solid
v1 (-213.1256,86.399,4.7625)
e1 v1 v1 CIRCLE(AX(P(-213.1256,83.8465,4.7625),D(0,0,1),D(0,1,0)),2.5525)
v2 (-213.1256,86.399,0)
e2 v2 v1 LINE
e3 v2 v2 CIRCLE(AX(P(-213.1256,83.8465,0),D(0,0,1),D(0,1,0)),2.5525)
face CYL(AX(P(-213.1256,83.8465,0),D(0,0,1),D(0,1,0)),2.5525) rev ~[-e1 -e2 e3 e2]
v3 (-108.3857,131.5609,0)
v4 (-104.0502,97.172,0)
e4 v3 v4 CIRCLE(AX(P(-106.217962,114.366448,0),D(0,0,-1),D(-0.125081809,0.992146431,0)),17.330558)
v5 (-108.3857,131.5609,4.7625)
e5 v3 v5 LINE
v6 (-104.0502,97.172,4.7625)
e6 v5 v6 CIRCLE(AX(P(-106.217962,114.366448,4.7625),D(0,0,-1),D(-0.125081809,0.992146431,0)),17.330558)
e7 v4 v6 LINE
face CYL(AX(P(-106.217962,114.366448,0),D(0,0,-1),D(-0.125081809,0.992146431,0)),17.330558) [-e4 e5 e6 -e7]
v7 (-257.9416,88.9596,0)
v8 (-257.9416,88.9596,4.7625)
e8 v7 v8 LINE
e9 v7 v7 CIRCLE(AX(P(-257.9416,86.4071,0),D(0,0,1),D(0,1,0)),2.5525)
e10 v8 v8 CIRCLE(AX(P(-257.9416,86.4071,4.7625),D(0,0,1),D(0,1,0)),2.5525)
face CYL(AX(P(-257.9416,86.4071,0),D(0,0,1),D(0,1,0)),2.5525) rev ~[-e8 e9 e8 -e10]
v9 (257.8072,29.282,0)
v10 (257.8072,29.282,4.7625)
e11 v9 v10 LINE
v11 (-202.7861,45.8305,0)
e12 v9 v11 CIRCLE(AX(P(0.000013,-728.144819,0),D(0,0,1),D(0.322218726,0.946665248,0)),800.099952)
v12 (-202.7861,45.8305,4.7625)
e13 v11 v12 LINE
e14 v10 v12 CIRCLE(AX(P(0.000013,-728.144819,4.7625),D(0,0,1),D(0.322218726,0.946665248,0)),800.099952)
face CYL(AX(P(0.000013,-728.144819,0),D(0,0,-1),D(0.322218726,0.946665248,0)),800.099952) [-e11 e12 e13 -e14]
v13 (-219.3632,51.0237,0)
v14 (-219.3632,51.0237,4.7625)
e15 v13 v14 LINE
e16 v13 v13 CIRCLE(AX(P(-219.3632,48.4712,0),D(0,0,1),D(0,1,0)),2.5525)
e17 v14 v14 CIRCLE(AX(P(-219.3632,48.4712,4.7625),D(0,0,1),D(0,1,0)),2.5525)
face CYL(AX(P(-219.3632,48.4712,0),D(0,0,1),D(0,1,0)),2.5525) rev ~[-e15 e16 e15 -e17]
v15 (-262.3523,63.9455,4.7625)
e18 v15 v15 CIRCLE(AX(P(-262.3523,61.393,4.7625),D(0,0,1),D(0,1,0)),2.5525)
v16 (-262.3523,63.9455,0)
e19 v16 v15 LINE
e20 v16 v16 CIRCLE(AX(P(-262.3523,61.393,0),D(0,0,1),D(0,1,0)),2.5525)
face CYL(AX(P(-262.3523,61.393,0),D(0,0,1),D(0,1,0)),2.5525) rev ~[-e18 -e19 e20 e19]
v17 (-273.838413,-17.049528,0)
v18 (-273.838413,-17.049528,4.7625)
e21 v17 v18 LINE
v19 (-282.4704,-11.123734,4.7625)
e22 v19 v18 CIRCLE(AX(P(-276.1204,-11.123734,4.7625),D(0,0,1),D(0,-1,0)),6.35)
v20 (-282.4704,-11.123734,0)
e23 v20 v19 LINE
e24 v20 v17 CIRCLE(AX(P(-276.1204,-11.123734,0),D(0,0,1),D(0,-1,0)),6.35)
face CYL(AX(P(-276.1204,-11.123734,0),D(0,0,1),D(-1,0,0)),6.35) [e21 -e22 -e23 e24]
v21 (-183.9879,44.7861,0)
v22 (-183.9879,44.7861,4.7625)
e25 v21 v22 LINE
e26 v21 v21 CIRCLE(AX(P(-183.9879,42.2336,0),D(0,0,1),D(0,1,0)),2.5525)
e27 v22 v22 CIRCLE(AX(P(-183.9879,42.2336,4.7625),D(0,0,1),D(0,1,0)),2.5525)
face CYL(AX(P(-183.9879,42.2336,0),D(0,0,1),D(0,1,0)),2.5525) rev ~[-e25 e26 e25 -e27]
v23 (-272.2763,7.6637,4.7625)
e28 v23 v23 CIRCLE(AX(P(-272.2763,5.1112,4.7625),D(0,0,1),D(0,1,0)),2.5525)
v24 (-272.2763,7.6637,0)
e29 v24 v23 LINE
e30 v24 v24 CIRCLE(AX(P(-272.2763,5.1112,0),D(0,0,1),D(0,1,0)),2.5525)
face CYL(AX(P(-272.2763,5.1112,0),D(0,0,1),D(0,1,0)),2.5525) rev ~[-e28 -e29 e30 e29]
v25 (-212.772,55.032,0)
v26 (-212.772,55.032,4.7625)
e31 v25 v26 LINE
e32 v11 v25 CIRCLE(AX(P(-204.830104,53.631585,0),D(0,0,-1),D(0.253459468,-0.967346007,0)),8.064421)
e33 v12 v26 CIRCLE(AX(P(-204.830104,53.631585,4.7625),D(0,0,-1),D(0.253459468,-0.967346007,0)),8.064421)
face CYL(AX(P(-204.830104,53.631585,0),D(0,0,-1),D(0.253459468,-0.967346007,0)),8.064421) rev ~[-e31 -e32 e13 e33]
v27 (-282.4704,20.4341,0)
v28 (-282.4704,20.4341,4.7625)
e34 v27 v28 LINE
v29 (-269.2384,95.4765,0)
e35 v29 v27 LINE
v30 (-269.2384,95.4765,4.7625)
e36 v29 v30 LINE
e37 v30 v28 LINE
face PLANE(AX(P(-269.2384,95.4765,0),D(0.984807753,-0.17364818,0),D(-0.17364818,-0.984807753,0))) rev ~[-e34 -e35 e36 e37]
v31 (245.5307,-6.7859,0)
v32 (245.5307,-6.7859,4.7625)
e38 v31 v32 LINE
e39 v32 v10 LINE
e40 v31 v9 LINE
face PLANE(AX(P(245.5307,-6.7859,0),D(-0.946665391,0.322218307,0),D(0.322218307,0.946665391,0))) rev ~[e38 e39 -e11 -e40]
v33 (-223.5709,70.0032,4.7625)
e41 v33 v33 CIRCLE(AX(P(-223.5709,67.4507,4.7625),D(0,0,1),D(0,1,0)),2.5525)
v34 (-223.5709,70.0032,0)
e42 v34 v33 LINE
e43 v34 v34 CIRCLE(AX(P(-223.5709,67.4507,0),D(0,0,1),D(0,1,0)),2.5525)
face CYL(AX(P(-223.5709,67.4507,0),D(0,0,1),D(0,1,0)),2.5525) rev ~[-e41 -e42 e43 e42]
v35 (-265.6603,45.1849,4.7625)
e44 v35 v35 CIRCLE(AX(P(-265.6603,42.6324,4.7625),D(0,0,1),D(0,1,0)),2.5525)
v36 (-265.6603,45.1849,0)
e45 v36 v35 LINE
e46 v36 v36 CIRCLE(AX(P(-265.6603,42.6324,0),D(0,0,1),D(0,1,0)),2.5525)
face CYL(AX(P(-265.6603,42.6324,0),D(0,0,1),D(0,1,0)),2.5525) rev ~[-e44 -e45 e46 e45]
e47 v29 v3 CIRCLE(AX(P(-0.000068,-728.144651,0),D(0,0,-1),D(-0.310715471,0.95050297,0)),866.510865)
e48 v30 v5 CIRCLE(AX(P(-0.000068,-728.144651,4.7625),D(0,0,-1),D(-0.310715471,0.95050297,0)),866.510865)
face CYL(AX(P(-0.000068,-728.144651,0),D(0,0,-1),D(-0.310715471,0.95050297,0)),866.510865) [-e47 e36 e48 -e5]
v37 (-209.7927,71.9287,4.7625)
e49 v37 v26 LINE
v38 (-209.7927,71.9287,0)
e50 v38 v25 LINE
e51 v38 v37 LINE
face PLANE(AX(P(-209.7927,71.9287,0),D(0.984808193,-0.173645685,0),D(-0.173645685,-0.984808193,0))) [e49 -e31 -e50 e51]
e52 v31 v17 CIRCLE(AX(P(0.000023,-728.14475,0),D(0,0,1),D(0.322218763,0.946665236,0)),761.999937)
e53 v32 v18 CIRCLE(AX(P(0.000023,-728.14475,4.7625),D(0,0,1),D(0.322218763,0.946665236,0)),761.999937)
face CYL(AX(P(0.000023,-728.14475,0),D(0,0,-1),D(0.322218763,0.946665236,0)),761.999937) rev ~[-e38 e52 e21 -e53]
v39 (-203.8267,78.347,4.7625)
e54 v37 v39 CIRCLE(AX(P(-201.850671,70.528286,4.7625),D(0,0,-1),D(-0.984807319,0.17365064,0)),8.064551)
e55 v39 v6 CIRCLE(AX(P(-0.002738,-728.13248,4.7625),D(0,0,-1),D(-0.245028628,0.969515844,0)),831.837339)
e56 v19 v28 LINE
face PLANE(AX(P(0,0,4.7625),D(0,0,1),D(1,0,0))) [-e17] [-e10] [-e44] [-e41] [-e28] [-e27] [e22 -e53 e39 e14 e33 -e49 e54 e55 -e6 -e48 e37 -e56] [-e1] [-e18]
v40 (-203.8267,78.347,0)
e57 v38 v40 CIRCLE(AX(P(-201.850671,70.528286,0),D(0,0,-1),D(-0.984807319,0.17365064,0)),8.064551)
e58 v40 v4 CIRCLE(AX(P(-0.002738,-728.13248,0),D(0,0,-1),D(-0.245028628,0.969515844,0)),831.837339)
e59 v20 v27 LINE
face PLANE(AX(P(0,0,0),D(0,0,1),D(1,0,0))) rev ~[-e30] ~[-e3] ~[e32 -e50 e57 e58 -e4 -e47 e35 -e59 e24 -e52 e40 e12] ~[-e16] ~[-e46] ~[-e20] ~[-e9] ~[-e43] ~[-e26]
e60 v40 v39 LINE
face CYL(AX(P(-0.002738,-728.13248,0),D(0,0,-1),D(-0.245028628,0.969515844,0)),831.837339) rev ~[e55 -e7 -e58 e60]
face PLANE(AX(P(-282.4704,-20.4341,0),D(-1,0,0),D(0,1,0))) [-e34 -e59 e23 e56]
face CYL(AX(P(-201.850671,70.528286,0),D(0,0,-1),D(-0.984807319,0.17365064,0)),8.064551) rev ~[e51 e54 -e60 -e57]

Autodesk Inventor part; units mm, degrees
ref_plane "YZ Plane" through (0, 0, 0) normal (1, 0, 0) x (0, 1, 0)
ref_plane "XZ Plane" through (0, 0, 0) normal (0, 1, 0) x (-1, 0, 0)
ref_plane "XY Plane" through (0, 0, 0) normal (0, 0, 1) x (1, 0, 0)
sketch "Sketch1" plane through (0, 0, 0) normal (0, 0, 1) x (1, 0, 0)
  line L0 (-282.4704, -20.4341) -> (-282.4704, 20.4341)
  line L1 (-394.804, 0) -> (382.9893, 0) construction
  arc A0 (245.5307, -6.7859) -> (-282.4704, -20.4341) centre (0, -728.1449) ccw
  arc A1 (257.8072, 29.282) -> (-282.4704, 20.4341) centre (0, -728.1449) ccw
  line L2 (245.5307, -6.7859) -> (257.8072, 29.282)
  line L3 (257.8072, 29.282) -> (259.8533, 35.2933)
  line L4 (259.8533, 35.2933) -> (271.8759, 31.2011)
  line L5 (271.8759, 31.2011) -> (255.5072, -16.8895)
  line L6 (255.5072, -16.8895) -> (243.4846, -12.7973)
  line L7 (243.4846, -12.7973) -> (245.5307, -6.7859)
  line L8 (0, 237.1551) -> (0, -889.0282) construction
  line L9 (0, -728.1449) -> (-282.4704, 0) construction
  arc A2 (205.7125, -1.0346) -> (-280.1164, -26.3317) centre (0, -728.1449) ccw
  line L10 (-280.1164, -26.3317) -> (-282.4704, -20.4341)
  line L11 (243.4846, -12.7973) -> (245.5307, -6.7859)
  point P0 (0, 0)
  point P1 (205.7125, -1.0346)
  dimension "d65" = 762
  dimension "d67" = 50.8
  dimension "d68" = 38.1
  dimension "d69" = 12.7
  dimension "d76" = 40
  dimension "d97" = 800.1
  dimension "d98" = 6.35
extrude "Plate1" add sketch "Sketch1" along normal blind 4.7625 contours L0 A1 L2 A0
sketch "Sketch3" plane through (0, 0, 0) normal (0, 0, -1) x (-1, 0, 0)
  line L0 (269.2384, 95.4765) -> (282.4704, 20.4341)
  arc A0 (282.4704, 20.4341) -> (-257.8072, 29.282) centre (0, -728.1449) ccw
  arc A1 (282.4704, -20.4341) -> (-245.5307, -6.7859) centre (0, -728.1449) ccw construction
  line L1 (0, -900.8528) -> (0, 308.1027) construction
  line L2 (-366.2845, 0) -> (393.0567, 0) construction
  arc A2 (269.2384, 95.4765) -> (108.3857, 131.5609) centre (0, -728.1449) ccw
  arc A3 (108.3857, 131.5609) -> (104.0502, 97.172) centre (106.218, 114.3664) ccw
  arc A4 (203.8267, 78.347) -> (104.0502, 97.172) centre (0, -728.1449) ccw
  arc A5 (209.7927, 71.9287) -> (203.8267, 78.347) centre (201.8507, 70.5283) ccw
  line L3 (209.7927, 71.9287) -> (212.772, 55.032)
  arc A6 (202.7861, 45.8305) -> (212.772, 55.032) centre (204.8301, 53.6316) ccw
  point P0 (0, 0)
  point P1 (-2.2036, 71.9521)
  dimension "d70" = 80
  dimension "d88" = 165.1
  dimension "d91" = 76.2
  dimension "d92" = 101.6
  dimension "d93" = 8.0645
  dimension "d95" = 31.75
sheet face with bend "Face2" sketch "Sketch3" thickness 4.7625 toward (0, 0, 1) bend radius 4.7625
bend "Bend1"
sketch "Sketch5" plane through (0, 0, 0) normal (0, 0, -1) x (-1, 0, 0)
  arc A0 (282.4704, -20.4341) -> (-245.5307, -6.7859) centre (0, -728.1449) ccw construction
  spline S0 degree 3 poles (-4.2317, 35.5309) (-3.9947, 36.2065) (-3.5205, 37.5578) (-2.7876, 39.577) (-2.0409, 41.5912) (-1.5294, 42.9288) (-1.2737, 43.5976) knots 0 0 0 0 0.214807 0.429614 0.644422 0.859229 0.859229 0.859229 0.859229
  spline S1 degree 3 poles (4.2317, 35.5309) (3.9947, 36.2065) (3.5205, 37.5578) (2.7876, 39.577) (2.0409, 41.5912) (1.5294, 42.9288) (1.2737, 43.5976) knots 0 0 0 0 0.214807 0.429614 0.644422 0.859229 0.859229 0.859229 0.859229
  circle A1 centre (0, -728.1449) radius 763.6875
  arc A2 (1.2737, 43.5976) -> (-1.2737, 43.5976) centre (0, -728.1449) ccw
  point P0 (-3.5169, 37.5565)
  point P1 (-2.7853, 39.5762)
  point P2 (-2.0375, 41.5899)
  point P3 (3.5169, 37.5565)
  point P4 (2.7853, 39.5762)
  point P5 (2.0375, 41.5899)
extrude "Extrusion1" [suppressed]
pattern_circular "Circular Pattern1" [suppressed]
sketch "Sketch4" plane through (0, 0, 0) normal (0, 0, -1) x (-1, 0, 0)
  line L0 (282.4704, 20.4341) -> (269.2384, 95.4765) construction
  circle A0 centre (198.5568, 63.04) radius 25.4 construction
  line L1 (177.7503, 77.6089) -> (213.1256, 83.8465) construction
  line L2 (213.1256, 83.8465) -> (183.9879, 42.2336) construction
  line L3 (183.9879, 42.2336) -> (219.3632, 48.4712) construction
  line L4 (173.5426, 58.6294) -> (223.5709, 67.4507) construction
  line L5 (282.4704, 20.4341) -> (269.2384, 95.4765) construction
  line L6 (262.3523, 61.393) -> (265.6603, 42.6324) construction
  line L7 (0, -43.6162) -> (0, 118.6586) construction
  point P0 (0, 0)
  point P1 (257.9416, 86.4071)
  point P2 (272.2763, 5.1112)
  dimension "d31" = 25.4
  dimension "d33" = 12.7
  dimension "d34" = 12.7
  dimension "d42" = 50.8
  dimension "d43" = 45
  dimension "d51" = 5.2605
  dimension "d52" = 19.05
  dimension "d53" = 38.1
  dimension "d89" = 198.5568
  dimension "d90" = 63.04
hole "Hole2" at (-257.9416, 86.4071, 0) at (-262.3523, 61.393, 0) at (-177.7503, 77.6089, 0) at (-173.5426, 58.6294, 0) at (-183.9879, 42.2336, 0) at (-219.3632, 48.4712, 0) at (-223.5709, 67.4507, 0) at (-213.1256, 83.8465, 0) at (-272.2763, 5.1112, 0) at (-265.6603, 42.6324, 0) direction (0, 0, 1) diameter 5.105 end through all clearance for "Flat Head Machine Screw (82)" size "#10" standard "Ansi Unified Screw Threads"
feature "Corner Round4" [suppressed]
feature "Corner Round5" [suppressed]
fillet "Corner Round6" radius 6.35 1 edges at (-282.4704, -20.4341, 2.3813)
equation "\"d33\" = d32"
equation "\"d34\" = d32"
equation "\"d40\" = Thickness"
equation "\"d5\" = Thickness"
equation "\"d22\" = BendRadius"
equation "\"d23\" = BendReliefWidth"
equation "\"d25\" = MinimumRemnant"
equation "\"d24\" = BendReliefDepth"
equation "\"d26\" = TransitionRadius"
equation "\"BendRadius\" = Thickness"
equation "\"BendReliefWidth\" = Thickness"
equation "\"BendReliefDepth\" = 0.5 * Thickness"
equation "\"CornerReliefSize\" = 4 * Thickness"
equation "\"MinimumRemnant\" = 2 * Thickness"
equation "\"TransitionRadius\" = BendRadius"
equation "\"JacobiRadiusSize\" = BendRadius"
equation "\"GapSize\" = Thickness"
equation "\"d32\" = 12.7"
equation "\"Thickness\" = 4.7625"
properties part number "RACK,INSIDE" material "Polycarbonate, PC 1000, Clear"
